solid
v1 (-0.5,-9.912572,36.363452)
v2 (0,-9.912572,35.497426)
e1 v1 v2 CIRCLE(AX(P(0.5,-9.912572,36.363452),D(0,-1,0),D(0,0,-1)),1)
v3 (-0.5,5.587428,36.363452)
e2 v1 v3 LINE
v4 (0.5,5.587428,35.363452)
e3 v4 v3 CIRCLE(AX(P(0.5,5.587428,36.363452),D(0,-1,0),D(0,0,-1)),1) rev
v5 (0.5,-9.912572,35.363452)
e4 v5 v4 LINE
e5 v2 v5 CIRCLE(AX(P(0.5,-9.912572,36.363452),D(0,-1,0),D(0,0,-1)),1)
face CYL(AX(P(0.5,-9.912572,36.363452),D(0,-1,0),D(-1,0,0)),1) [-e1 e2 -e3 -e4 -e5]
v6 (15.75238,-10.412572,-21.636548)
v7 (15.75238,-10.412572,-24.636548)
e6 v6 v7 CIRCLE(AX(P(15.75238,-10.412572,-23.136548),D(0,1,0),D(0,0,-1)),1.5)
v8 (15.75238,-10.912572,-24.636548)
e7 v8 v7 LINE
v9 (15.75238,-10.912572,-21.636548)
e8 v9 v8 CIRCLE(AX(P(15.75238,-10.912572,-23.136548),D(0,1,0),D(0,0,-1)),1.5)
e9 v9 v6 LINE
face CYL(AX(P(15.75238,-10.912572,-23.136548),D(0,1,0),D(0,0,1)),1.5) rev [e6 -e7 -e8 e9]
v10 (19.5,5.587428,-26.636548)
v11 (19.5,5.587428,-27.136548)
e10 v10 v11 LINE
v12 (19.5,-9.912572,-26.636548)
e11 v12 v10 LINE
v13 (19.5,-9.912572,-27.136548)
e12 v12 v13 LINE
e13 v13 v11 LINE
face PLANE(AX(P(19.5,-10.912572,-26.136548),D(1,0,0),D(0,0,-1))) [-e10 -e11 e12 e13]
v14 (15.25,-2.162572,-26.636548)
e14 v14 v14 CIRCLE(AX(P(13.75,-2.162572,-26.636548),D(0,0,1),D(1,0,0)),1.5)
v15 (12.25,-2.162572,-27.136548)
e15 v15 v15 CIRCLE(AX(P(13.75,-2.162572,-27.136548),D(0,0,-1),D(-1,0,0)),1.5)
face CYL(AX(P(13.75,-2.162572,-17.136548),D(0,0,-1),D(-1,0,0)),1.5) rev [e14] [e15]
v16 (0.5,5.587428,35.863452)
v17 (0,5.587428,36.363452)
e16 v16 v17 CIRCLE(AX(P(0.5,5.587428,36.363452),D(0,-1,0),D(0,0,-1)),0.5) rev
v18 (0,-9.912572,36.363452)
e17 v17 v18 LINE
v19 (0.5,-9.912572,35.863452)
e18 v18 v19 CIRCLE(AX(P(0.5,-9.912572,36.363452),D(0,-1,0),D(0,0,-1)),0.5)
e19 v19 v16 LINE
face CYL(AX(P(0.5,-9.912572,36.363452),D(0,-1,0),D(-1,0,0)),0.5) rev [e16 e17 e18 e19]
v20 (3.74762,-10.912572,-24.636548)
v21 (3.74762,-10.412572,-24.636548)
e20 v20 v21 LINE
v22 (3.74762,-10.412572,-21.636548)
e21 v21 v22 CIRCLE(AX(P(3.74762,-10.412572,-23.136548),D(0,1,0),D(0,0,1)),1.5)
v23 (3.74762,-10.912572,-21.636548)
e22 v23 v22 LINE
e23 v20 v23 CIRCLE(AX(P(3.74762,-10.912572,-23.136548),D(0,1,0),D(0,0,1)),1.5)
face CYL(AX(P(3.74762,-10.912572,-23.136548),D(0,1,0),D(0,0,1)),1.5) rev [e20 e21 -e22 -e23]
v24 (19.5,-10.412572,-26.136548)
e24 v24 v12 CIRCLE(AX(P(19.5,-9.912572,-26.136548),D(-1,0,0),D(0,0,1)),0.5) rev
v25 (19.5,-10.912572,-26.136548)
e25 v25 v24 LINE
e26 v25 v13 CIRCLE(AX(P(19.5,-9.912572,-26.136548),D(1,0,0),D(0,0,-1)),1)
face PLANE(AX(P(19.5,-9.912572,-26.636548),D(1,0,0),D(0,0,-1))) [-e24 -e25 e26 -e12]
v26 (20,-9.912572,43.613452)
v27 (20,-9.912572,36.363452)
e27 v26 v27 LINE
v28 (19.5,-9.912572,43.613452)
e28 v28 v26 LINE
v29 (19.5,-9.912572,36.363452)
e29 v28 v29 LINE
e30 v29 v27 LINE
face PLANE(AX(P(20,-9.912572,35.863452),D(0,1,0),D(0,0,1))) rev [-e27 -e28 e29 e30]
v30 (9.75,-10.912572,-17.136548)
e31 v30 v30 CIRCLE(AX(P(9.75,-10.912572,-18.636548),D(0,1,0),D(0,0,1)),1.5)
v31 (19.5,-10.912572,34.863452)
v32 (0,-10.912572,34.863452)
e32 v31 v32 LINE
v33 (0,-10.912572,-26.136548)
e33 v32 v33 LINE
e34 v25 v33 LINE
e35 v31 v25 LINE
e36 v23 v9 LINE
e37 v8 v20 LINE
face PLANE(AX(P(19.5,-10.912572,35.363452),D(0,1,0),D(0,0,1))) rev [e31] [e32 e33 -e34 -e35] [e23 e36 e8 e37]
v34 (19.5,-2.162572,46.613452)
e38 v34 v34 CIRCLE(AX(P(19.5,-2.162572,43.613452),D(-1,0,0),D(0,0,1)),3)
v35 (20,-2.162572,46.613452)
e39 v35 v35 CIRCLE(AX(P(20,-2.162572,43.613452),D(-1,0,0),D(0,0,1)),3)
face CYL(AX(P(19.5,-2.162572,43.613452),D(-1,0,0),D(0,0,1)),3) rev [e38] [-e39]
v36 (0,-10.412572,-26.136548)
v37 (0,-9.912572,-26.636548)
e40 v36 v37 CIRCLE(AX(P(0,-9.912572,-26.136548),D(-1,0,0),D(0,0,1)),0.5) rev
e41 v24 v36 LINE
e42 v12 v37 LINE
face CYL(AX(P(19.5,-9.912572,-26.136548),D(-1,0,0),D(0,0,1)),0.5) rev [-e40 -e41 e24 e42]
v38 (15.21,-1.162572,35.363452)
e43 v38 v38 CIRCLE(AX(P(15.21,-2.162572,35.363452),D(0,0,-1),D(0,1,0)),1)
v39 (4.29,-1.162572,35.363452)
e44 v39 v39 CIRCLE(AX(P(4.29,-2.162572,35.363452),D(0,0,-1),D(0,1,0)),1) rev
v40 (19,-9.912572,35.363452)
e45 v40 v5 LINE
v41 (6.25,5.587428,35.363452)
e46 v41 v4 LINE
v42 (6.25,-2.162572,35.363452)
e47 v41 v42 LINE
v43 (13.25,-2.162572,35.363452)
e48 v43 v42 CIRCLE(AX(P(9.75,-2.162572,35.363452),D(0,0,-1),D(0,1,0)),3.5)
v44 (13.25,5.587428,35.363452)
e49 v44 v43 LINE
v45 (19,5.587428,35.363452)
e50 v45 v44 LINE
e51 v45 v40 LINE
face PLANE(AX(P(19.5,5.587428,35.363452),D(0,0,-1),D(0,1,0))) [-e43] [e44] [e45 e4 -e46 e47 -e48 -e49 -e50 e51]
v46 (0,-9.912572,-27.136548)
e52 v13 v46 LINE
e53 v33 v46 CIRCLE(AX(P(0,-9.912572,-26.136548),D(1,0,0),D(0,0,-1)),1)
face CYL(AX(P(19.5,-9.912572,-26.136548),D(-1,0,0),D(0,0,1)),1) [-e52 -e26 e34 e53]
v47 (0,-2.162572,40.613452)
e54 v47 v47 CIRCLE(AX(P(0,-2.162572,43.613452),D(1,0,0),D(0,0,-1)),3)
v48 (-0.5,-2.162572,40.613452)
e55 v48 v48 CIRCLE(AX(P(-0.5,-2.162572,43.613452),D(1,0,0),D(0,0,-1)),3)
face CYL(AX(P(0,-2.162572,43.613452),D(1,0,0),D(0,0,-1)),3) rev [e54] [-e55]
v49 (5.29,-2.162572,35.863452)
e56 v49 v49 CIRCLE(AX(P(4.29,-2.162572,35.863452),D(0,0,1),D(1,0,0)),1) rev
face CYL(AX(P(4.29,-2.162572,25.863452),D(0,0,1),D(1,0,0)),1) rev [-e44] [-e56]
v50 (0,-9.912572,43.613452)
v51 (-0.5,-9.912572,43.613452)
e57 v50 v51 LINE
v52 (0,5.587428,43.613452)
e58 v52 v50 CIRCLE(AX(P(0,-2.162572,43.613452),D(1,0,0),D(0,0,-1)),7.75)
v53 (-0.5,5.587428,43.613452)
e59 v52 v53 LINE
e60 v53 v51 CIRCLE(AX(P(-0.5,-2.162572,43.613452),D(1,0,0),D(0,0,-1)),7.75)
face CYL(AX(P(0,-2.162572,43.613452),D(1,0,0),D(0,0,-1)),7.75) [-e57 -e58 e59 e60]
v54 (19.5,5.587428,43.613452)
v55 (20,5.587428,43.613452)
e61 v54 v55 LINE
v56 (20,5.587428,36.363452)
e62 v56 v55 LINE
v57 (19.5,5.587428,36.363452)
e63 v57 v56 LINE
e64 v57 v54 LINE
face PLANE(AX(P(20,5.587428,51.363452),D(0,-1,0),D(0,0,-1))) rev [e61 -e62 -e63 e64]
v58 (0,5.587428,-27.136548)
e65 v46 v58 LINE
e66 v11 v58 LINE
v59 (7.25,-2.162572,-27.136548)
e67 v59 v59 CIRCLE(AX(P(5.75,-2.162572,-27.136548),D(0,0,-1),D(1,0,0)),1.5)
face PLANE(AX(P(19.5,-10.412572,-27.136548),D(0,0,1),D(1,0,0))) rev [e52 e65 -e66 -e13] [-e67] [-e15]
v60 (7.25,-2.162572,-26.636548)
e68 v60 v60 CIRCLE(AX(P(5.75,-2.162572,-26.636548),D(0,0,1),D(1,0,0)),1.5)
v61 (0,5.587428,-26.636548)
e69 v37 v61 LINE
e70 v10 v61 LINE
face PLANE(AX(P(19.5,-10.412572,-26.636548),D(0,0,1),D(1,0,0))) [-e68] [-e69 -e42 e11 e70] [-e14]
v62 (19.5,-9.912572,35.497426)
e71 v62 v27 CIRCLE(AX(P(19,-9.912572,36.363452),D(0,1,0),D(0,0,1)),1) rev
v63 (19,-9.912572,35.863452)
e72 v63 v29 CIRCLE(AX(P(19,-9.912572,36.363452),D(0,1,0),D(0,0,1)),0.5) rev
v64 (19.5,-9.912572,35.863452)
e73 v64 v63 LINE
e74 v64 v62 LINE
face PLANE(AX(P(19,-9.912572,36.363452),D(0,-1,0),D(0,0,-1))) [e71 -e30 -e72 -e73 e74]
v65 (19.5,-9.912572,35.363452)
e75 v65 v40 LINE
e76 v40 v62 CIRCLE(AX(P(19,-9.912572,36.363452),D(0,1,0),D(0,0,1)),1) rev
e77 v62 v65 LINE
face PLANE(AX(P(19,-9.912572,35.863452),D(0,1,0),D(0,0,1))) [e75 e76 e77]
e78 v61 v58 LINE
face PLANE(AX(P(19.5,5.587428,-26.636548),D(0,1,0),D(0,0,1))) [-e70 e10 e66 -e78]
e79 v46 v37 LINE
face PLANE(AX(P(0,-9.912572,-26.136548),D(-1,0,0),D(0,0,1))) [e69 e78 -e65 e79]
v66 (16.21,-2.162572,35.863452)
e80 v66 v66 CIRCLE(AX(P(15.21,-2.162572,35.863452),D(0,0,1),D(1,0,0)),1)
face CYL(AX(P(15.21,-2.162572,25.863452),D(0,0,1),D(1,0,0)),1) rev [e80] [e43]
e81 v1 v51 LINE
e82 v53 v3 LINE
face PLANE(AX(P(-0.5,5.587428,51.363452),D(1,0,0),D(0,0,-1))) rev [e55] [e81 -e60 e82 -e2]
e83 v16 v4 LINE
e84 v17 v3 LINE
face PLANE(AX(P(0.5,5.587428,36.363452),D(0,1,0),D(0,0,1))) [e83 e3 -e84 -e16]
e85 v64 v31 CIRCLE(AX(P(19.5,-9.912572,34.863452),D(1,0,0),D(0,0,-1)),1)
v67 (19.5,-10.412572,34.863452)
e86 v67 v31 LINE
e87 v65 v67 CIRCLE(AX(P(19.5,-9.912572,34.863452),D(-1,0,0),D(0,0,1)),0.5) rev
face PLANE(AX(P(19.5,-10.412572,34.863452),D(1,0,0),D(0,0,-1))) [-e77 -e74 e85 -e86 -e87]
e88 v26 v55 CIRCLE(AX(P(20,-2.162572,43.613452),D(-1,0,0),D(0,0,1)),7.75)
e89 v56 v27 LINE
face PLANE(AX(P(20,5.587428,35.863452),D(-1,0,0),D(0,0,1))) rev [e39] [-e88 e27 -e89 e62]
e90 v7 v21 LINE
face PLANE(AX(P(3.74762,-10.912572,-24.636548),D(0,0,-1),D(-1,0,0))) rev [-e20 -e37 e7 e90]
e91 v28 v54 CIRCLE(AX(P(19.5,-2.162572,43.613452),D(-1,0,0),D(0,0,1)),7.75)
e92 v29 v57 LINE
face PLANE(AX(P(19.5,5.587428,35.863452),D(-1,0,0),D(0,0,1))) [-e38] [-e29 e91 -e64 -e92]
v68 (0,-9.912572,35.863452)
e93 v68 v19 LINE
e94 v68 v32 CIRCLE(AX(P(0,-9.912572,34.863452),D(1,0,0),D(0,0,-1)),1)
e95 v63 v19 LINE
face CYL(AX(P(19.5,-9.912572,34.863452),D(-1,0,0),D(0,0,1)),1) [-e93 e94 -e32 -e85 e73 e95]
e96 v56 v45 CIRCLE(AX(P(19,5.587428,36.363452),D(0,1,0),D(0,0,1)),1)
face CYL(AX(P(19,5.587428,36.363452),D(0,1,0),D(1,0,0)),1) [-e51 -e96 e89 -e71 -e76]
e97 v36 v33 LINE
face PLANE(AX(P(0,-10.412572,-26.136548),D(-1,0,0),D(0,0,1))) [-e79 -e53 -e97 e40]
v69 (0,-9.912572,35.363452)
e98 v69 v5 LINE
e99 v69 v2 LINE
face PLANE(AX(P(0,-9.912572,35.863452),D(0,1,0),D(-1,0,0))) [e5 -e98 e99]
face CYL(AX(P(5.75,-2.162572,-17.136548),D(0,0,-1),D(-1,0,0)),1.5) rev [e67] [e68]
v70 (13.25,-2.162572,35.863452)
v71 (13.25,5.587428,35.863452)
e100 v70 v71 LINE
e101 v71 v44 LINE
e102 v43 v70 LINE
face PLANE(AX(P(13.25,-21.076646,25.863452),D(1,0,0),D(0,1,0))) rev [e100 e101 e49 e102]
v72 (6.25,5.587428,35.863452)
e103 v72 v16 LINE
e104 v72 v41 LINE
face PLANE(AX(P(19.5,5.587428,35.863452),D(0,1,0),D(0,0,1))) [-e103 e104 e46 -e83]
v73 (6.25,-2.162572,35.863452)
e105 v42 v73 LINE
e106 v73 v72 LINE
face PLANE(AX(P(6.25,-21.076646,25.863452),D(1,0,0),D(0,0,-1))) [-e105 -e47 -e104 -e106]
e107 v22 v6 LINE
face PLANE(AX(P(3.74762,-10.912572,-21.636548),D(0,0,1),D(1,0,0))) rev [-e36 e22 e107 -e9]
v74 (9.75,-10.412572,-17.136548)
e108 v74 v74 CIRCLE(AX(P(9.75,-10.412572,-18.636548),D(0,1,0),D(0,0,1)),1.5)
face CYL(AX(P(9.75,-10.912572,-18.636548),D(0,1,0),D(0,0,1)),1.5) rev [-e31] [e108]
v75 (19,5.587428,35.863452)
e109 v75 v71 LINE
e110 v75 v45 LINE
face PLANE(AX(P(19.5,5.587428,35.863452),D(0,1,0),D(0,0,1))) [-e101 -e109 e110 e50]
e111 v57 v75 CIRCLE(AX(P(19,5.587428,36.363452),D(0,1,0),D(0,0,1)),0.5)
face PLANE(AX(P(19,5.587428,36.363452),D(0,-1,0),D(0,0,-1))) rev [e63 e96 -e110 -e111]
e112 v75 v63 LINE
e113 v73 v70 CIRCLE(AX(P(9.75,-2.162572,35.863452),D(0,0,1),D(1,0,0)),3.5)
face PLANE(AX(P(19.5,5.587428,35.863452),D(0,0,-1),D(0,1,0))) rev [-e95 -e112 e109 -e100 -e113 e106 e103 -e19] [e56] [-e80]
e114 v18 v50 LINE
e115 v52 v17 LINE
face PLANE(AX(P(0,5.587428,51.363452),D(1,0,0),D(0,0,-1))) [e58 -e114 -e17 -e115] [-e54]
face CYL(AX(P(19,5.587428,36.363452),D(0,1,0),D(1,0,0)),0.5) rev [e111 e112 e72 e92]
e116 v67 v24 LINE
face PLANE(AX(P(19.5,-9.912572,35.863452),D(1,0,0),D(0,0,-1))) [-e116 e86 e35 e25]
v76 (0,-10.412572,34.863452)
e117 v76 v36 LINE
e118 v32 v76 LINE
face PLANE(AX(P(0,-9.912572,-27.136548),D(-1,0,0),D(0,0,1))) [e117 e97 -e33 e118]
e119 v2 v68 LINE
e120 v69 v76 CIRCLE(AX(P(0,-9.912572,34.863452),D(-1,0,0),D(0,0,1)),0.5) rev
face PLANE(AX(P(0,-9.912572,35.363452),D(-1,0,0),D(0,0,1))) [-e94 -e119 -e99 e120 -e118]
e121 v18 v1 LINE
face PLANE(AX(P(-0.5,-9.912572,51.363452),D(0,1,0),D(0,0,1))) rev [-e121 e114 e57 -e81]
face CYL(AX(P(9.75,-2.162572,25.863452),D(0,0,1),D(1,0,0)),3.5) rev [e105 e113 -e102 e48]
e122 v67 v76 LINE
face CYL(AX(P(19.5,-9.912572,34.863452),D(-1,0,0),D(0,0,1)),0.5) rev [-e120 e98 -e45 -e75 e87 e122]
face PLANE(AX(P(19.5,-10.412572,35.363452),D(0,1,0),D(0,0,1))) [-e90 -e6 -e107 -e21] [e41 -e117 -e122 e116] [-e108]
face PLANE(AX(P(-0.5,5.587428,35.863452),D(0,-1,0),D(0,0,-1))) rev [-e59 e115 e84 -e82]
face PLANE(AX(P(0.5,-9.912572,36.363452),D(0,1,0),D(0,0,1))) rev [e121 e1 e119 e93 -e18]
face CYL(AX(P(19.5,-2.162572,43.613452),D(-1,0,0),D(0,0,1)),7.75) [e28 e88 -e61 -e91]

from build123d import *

# Parameters (mm, degrees)
BRIDA_BASE1_DEPTH                  = 19.5
BRIDA_DE_ARISTA1_STRIP_W           = 3
BRIDA_DE_ARISTA1_STRIP_H           = 0.5
BRIDA_DE_ARISTA1_STRIP_CUT_DEPTH   = 15.5
BRIDA_DE_ARISTA1_STRIP_2_W         = 3
BRIDA_DE_ARISTA1_STRIP_2_H         = 0.5
BRIDA_DE_ARISTA1_STRIP_CUT_2_DEPTH = 15.5
BRIDA_DE_ARISTA1_DEPTH             = 15.5
BRIDA_DE_ARISTA1_BEND_DEPTH        = 15.5
CROQUIS11_R                        = 3
CORTAR_EXTRUIR1_DEPTH              = 57.369658542
CROQUIS14_R                        = 1
CORTAR_EXTRUIR2_DEPTH              = 10
CROQUIS15_R                        = 1.5
CORTAR_EXTRUIR3_DEPTH              = 10
CROQUIS16_R                        = 1.5
CORTAR_EXTRUIR4_DEPTH              = 0.5


# Sheet-metal steps are written as plain solids
with BuildPart() as part:
    # Croquis1 → Brida base1 (new body)
    with BuildSketch(Plane(origin=(0, 0, 0), x_dir=(0, 0, -1), z_dir=(1, 0, 0))):
        with BuildLine():
            Line((-35.363451777, 5.587428088), (-35.363451777, -9.912571912))
            ThreePointArc((-35.363451777, -9.912571912), (-35.217005167, -10.266125303), (-34.863451777, -10.412571912))
            Line((-34.863451777, -10.412571912), (26.136548223, -10.412571912))
            ThreePointArc((26.136548223, -10.412571912), (26.490101614, -10.266125303), (26.636548223, -9.912571912))
            Line((26.636548223, -9.912571912), (26.636548223, 5.587428088))
            Line((26.636548223, 5.587428088), (27.136548223, 5.587428088))
            Line((27.136548223, 5.587428088), (27.136548223, -9.912571912))
            ThreePointArc((27.136548223, -9.912571912), (26.843655005, -10.619678693), (26.136548223, -10.912571912))
            Line((26.136548223, -10.912571912), (-34.863451777, -10.912571912))
            ThreePointArc((-34.863451777, -10.912571912), (-35.570558558, -10.619678693), (-35.863451777, -9.912571912))
            Line((-35.863451777, -9.912571912), (-35.863451777, 5.587428088))
            Line((-35.863451777, 5.587428088), (-35.363451777, 5.587428088))
        make_face()
    extrude(amount=BRIDA_BASE1_DEPTH)

    # Brida de arista1 strip (across the edge) → Brida de arista1 strip cut (cut)
    with BuildSketch(Plane(origin=(19.5, -9.912571912, 35.863451777), x_dir=(-1, 0, 0), z_dir=(0, 1, 0))):
        with Locations((-1, -0.25)):
            Rectangle(BRIDA_DE_ARISTA1_STRIP_W, BRIDA_DE_ARISTA1_STRIP_H)
    extrude(amount=BRIDA_DE_ARISTA1_STRIP_CUT_DEPTH, mode=Mode.SUBTRACT)

    # Brida de arista1 strip 2 (across the edge) → Brida de arista1 strip cut 2 (cut)
    with BuildSketch(Plane(origin=(0, 5.587428088, 35.863451777), x_dir=(1, 0, 0), z_dir=(0, -1, 0))):
        with Locations((-1, -0.25)):
            Rectangle(BRIDA_DE_ARISTA1_STRIP_2_W, BRIDA_DE_ARISTA1_STRIP_2_H)
    extrude(amount=BRIDA_DE_ARISTA1_STRIP_CUT_2_DEPTH, mode=Mode.SUBTRACT)

    # Brida de arista1 section (across the edge) → Brida de arista1 (add)
    with BuildSketch(Plane(origin=(19.5, -9.912571912, 35.863451777), x_dir=(-1, 0, 0), z_dir=(0, 1, 0))):
        with BuildLine():
            Line((-0.5, 0.5), (-0.5, 15.5))
            Line((-0.5, 15.5), (0, 15.5))
            Line((0, 15.5), (0, 0.5))
            ThreePointArc((0, 0.5), (0.146446609, 0.146446609), (0.5, 0))
            Line((0.5, 0), (0.5, -0.5))
            ThreePointArc((0.5, -0.5), (-0.207106781, -0.207106781), (-0.5, 0.5))
        make_face()
    extrude(amount=BRIDA_DE_ARISTA1_DEPTH)

    # Brida de arista1 section 2 (across the edge) → Brida de arista1 bend (add)
    with BuildSketch(Plane(origin=(0, 5.587428088, 35.863451777), x_dir=(1, 0, 0), z_dir=(0, -1, 0))):
        with BuildLine():
            Line((-0.5, 0.5), (-0.5, 15.5))
            Line((-0.5, 15.5), (0, 15.5))
            Line((0, 15.5), (0, 0.5))
            ThreePointArc((0, 0.5), (0.146446609, 0.146446609), (0.5, 0))
            Line((0.5, 0), (0.5, -0.5))
            ThreePointArc((0.5, -0.5), (-0.207106781, -0.207106781), (-0.5, 0.5))
        make_face()
    extrude(amount=BRIDA_DE_ARISTA1_BEND_DEPTH)

    # Croquis11 → Cortar-Extruir1 (cut, through all)
    with BuildSketch(Plane(origin=(20, 0, 0), x_dir=(0, 0, -1), z_dir=(1, 0, 0))):
        with Locations(Location((-43.613451777, -2.162571912, 0), (0, 0, 180))):
            Circle(CROQUIS11_R)
        with BuildLine():
            ThreePointArc((-43.613451777, -9.912571912), (-49.093529331, -7.642649466), (-51.363451777, -2.162571912))
            Line((-51.363451777, -2.162571912), (-51.363451777, -9.912571912))
            Line((-51.363451777, -9.912571912), (-43.613451777, -9.912571912))
        make_face()
        with BuildLine():
            ThreePointArc((-51.363451777, -2.162571912), (-49.093529331, 3.317505642), (-43.613451777, 5.587428088))
            Line((-43.613451777, 5.587428088), (-51.363451777, 5.587428088))
            Line((-51.363451777, 5.587428088), (-51.363451777, -2.162571912))
        make_face()
    extrude(amount=-CORTAR_EXTRUIR1_DEPTH, mode=Mode.SUBTRACT)

    # Croquis14 → Cortar-Extruir2 (cut)
    with BuildSketch(Plane.XY.offset(35.863451777)):
        with Locations((15.21, -2.162571912)):
            Circle(CROQUIS14_R)
        with Locations((4.29, -2.162571912)):
            Circle(CROQUIS14_R)
        with BuildLine():
            Line((6.25, 5.587428088), (6.25, -2.162571912))
            ThreePointArc((6.25, -2.162571912), (9.75, -5.662571912), (13.25, -2.162571912))
            Line((13.25, -2.162571912), (13.25, 5.587428088))
            Line((13.25, 5.587428088), (6.25, 5.587428088))
        make_face()
    extrude(amount=-CORTAR_EXTRUIR2_DEPTH, mode=Mode.SUBTRACT)

    # Croquis15 → Cortar-Extruir3 (cut)
    with BuildSketch(Plane(origin=(0, 0, -27.136548223), x_dir=(-1, 0, 0), z_dir=(0, 0, -1))):
        with Locations((-13.75, -2.162571912)):
            Circle(CROQUIS15_R)
        with Locations(Location((-5.75, -2.162571912, 0), (0, 0, 180))):
            Circle(CROQUIS15_R)
    extrude(amount=-CORTAR_EXTRUIR3_DEPTH, mode=Mode.SUBTRACT)

    # Croquis16 → Cortar-Extruir4 (cut)
    with BuildSketch(Plane(origin=(0, -10.412571912, 0), x_dir=(-1, 0, 0), z_dir=(0, 1, 0))):
        with Locations(Location((-9.75, -18.636548223, 0), (0, 0, 90))):
            Circle(CROQUIS16_R)
        with BuildLine():
            Line((-3.747619635, -21.636548223), (-15.752380365, -21.636548223))
            ThreePointArc((-15.752380365, -21.636548223), (-17.252380365, -23.136548223), (-15.752380365, -24.636548223))
            Line((-15.752380365, -24.636548223), (-3.747619635, -24.636548223))
            ThreePointArc((-3.747619635, -24.636548223), (-2.247619635, -23.136548223), (-3.747619635, -21.636548223))
        make_face()
    extrude(amount=-CORTAR_EXTRUIR4_DEPTH, mode=Mode.SUBTRACT)


solid = part.part
